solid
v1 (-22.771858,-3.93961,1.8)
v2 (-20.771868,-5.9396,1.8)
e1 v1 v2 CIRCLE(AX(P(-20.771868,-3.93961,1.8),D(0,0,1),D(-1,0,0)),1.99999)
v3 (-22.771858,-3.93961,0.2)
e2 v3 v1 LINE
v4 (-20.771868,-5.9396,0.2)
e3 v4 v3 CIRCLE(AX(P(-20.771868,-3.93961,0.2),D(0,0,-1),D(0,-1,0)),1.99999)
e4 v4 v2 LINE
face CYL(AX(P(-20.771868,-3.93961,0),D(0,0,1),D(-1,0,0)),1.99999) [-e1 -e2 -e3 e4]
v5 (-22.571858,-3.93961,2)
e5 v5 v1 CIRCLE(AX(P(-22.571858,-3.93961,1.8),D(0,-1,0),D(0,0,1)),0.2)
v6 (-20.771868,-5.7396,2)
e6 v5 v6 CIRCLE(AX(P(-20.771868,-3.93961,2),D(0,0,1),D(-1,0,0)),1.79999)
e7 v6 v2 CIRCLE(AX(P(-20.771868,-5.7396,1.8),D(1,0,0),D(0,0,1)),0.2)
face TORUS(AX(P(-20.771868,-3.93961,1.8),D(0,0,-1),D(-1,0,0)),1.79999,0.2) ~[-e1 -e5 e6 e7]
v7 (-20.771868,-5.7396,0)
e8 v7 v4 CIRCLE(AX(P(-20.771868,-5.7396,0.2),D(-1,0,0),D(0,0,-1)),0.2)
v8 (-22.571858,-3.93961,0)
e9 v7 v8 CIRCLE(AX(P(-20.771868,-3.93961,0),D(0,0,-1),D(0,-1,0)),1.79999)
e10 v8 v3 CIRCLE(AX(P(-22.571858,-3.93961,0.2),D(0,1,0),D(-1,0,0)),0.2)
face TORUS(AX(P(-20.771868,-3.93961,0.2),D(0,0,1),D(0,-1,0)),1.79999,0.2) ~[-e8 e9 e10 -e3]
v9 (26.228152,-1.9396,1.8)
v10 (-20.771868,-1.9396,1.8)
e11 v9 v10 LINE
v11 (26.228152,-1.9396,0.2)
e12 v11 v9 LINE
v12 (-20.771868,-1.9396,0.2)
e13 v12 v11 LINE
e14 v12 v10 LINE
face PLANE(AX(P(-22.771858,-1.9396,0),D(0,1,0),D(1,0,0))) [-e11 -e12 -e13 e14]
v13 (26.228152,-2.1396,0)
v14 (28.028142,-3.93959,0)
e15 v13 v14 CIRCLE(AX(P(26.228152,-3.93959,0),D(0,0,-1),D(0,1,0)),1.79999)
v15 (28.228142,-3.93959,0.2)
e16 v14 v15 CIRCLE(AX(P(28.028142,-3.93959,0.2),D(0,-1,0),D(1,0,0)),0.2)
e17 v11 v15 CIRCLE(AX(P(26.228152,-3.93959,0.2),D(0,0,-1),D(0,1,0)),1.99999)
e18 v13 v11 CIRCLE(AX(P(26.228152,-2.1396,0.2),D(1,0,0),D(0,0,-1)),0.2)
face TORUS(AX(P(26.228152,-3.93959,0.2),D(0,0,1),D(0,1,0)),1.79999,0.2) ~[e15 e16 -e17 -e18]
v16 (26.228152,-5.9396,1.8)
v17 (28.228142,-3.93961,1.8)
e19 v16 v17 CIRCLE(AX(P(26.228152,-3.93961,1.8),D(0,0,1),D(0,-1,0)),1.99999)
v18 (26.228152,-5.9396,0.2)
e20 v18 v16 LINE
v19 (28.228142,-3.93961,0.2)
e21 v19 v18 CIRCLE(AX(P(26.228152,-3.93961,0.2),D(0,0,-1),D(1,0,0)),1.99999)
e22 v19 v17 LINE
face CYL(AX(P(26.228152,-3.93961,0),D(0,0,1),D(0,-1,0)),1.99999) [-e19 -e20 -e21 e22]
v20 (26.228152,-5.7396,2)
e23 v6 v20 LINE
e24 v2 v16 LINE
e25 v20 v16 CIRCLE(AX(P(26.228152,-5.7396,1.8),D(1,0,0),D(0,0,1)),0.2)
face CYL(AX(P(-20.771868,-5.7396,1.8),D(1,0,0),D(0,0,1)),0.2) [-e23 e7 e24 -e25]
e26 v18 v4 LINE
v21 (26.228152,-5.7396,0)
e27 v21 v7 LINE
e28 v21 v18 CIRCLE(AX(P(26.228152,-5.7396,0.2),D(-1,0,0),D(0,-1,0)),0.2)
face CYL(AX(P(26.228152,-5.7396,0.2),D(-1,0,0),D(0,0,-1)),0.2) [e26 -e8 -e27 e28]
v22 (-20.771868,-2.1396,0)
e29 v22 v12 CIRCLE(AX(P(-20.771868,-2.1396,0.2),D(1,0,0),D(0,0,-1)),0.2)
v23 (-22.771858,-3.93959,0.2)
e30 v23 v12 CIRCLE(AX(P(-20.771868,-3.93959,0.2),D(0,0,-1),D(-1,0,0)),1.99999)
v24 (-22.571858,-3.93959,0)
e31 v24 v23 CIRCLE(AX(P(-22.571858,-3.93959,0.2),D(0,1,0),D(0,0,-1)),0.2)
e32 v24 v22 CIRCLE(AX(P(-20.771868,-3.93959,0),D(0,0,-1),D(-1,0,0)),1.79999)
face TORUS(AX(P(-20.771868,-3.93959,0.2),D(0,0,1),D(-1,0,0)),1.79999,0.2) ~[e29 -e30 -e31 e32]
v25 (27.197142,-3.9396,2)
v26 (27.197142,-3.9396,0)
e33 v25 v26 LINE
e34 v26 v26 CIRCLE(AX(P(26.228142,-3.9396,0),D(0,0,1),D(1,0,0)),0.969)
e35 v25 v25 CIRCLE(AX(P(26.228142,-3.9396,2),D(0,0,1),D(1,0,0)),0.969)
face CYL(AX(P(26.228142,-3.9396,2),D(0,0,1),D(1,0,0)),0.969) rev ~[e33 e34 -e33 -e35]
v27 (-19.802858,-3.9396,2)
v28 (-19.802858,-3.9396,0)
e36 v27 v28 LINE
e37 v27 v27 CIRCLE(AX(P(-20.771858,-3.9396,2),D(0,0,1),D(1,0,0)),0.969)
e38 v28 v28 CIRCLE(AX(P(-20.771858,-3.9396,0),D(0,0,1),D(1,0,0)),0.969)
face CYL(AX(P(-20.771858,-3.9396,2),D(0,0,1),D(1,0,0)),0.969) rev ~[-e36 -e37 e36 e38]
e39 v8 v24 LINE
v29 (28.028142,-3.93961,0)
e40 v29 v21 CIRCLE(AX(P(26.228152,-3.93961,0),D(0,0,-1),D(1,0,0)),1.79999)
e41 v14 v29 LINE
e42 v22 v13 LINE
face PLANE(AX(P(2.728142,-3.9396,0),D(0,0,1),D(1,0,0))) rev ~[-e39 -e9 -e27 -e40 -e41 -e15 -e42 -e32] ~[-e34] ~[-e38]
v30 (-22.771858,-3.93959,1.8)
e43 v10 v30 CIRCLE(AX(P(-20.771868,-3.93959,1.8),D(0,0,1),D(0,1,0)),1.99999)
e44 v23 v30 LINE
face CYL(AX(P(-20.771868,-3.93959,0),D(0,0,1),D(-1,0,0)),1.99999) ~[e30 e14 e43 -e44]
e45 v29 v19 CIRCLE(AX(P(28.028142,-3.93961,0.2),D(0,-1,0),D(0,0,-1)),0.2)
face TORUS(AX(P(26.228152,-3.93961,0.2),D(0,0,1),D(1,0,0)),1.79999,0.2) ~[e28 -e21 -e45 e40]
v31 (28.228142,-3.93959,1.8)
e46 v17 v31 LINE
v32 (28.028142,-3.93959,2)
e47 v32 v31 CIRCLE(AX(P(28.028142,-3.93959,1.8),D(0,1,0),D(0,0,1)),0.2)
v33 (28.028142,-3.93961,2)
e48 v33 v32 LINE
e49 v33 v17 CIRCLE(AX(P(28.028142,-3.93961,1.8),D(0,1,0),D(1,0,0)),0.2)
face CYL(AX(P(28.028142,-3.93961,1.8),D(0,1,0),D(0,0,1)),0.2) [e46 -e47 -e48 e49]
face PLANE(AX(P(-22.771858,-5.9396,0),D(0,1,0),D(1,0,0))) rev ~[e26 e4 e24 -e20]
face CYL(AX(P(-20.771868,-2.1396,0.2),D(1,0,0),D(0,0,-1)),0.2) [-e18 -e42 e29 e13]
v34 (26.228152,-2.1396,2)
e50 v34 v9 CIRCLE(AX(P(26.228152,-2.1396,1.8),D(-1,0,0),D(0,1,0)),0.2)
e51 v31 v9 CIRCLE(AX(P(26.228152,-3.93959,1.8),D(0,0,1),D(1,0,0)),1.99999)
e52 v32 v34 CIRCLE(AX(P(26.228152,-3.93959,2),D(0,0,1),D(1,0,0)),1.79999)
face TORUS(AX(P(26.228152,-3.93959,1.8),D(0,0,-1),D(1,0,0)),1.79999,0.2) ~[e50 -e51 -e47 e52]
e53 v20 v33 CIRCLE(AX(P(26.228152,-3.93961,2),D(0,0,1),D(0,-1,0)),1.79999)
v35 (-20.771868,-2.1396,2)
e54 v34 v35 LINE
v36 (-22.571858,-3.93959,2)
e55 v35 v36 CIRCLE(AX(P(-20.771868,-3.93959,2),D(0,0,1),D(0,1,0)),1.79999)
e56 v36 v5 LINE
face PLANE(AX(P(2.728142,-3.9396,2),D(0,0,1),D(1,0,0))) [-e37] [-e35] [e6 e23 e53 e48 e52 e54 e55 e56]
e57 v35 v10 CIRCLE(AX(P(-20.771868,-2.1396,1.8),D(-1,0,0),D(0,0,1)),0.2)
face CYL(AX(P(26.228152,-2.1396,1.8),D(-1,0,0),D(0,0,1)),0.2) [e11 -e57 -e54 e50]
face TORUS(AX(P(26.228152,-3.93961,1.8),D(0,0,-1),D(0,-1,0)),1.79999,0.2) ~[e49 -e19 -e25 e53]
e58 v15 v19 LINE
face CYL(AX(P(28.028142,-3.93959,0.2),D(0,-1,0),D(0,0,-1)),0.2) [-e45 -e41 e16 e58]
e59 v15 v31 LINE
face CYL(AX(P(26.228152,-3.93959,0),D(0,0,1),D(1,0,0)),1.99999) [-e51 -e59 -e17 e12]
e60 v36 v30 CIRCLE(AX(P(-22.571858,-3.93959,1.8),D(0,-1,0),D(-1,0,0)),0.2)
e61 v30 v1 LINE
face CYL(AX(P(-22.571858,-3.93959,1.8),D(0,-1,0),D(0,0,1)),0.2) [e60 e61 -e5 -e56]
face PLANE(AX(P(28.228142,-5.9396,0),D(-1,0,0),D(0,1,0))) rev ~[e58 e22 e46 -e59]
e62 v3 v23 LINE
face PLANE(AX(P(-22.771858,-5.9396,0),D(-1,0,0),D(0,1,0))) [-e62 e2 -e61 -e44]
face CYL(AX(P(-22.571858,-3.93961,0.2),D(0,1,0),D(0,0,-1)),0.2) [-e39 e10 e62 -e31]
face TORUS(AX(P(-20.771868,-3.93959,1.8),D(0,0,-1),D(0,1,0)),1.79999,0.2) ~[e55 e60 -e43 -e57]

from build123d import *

# Parameters (mm, degrees)
F0_W     = 51
F0_H     = 4
F1_DEPTH = 2
F2_R     = 1.99999
F3_R     = 0.969
F4_DEPTH = 25
F5_R     = 0.2


# Not quite as in the source:
# - a fillet or chamfer is up to 0.001 mm smaller than in the source, because OpenCascade refuses the exact size


with BuildPart() as f1:
    # F0 (on Top) → F1 (new body)
    with BuildSketch(Plane.XY):
        with Locations((2.7281418443, -3.9396004599)):
            Rectangle(F0_W, F0_H)
    extrude(amount=F1_DEPTH)

    # F2 (radius 2 in the source; OpenCascade refuses exactly that, so slightly less here)
    f2_edges = [f1.edges().sort_by_distance(p)[0] for p in [
        (28.228142, -1.9396, 1),
        (28.228142, -5.9396, 1),
        (-22.771858, -1.9396, 1),
        (-22.771858, -5.9396, 1),
    ]]
    fillet(f2_edges, radius=F2_R)

    # F3 (on face) → F4 (cut)
    with BuildSketch(Plane.XY.offset(2)):
        with Locations((-20.7718581557, -3.9396004599)):
            Circle(F3_R)
        with Locations((26.2281418443, -3.9396004599)):
            Circle(F3_R)
    extrude(amount=-F4_DEPTH, mode=Mode.SUBTRACT)

    # F5
    f5_edges = [f1.edges().sort_by_distance(p)[0] for p in [
        (2.728142, -1.9396, 0),
        (2.728142, -5.9396, 2),
    ]]
    fillet(f5_edges, radius=F5_R)


solid = f1.part
